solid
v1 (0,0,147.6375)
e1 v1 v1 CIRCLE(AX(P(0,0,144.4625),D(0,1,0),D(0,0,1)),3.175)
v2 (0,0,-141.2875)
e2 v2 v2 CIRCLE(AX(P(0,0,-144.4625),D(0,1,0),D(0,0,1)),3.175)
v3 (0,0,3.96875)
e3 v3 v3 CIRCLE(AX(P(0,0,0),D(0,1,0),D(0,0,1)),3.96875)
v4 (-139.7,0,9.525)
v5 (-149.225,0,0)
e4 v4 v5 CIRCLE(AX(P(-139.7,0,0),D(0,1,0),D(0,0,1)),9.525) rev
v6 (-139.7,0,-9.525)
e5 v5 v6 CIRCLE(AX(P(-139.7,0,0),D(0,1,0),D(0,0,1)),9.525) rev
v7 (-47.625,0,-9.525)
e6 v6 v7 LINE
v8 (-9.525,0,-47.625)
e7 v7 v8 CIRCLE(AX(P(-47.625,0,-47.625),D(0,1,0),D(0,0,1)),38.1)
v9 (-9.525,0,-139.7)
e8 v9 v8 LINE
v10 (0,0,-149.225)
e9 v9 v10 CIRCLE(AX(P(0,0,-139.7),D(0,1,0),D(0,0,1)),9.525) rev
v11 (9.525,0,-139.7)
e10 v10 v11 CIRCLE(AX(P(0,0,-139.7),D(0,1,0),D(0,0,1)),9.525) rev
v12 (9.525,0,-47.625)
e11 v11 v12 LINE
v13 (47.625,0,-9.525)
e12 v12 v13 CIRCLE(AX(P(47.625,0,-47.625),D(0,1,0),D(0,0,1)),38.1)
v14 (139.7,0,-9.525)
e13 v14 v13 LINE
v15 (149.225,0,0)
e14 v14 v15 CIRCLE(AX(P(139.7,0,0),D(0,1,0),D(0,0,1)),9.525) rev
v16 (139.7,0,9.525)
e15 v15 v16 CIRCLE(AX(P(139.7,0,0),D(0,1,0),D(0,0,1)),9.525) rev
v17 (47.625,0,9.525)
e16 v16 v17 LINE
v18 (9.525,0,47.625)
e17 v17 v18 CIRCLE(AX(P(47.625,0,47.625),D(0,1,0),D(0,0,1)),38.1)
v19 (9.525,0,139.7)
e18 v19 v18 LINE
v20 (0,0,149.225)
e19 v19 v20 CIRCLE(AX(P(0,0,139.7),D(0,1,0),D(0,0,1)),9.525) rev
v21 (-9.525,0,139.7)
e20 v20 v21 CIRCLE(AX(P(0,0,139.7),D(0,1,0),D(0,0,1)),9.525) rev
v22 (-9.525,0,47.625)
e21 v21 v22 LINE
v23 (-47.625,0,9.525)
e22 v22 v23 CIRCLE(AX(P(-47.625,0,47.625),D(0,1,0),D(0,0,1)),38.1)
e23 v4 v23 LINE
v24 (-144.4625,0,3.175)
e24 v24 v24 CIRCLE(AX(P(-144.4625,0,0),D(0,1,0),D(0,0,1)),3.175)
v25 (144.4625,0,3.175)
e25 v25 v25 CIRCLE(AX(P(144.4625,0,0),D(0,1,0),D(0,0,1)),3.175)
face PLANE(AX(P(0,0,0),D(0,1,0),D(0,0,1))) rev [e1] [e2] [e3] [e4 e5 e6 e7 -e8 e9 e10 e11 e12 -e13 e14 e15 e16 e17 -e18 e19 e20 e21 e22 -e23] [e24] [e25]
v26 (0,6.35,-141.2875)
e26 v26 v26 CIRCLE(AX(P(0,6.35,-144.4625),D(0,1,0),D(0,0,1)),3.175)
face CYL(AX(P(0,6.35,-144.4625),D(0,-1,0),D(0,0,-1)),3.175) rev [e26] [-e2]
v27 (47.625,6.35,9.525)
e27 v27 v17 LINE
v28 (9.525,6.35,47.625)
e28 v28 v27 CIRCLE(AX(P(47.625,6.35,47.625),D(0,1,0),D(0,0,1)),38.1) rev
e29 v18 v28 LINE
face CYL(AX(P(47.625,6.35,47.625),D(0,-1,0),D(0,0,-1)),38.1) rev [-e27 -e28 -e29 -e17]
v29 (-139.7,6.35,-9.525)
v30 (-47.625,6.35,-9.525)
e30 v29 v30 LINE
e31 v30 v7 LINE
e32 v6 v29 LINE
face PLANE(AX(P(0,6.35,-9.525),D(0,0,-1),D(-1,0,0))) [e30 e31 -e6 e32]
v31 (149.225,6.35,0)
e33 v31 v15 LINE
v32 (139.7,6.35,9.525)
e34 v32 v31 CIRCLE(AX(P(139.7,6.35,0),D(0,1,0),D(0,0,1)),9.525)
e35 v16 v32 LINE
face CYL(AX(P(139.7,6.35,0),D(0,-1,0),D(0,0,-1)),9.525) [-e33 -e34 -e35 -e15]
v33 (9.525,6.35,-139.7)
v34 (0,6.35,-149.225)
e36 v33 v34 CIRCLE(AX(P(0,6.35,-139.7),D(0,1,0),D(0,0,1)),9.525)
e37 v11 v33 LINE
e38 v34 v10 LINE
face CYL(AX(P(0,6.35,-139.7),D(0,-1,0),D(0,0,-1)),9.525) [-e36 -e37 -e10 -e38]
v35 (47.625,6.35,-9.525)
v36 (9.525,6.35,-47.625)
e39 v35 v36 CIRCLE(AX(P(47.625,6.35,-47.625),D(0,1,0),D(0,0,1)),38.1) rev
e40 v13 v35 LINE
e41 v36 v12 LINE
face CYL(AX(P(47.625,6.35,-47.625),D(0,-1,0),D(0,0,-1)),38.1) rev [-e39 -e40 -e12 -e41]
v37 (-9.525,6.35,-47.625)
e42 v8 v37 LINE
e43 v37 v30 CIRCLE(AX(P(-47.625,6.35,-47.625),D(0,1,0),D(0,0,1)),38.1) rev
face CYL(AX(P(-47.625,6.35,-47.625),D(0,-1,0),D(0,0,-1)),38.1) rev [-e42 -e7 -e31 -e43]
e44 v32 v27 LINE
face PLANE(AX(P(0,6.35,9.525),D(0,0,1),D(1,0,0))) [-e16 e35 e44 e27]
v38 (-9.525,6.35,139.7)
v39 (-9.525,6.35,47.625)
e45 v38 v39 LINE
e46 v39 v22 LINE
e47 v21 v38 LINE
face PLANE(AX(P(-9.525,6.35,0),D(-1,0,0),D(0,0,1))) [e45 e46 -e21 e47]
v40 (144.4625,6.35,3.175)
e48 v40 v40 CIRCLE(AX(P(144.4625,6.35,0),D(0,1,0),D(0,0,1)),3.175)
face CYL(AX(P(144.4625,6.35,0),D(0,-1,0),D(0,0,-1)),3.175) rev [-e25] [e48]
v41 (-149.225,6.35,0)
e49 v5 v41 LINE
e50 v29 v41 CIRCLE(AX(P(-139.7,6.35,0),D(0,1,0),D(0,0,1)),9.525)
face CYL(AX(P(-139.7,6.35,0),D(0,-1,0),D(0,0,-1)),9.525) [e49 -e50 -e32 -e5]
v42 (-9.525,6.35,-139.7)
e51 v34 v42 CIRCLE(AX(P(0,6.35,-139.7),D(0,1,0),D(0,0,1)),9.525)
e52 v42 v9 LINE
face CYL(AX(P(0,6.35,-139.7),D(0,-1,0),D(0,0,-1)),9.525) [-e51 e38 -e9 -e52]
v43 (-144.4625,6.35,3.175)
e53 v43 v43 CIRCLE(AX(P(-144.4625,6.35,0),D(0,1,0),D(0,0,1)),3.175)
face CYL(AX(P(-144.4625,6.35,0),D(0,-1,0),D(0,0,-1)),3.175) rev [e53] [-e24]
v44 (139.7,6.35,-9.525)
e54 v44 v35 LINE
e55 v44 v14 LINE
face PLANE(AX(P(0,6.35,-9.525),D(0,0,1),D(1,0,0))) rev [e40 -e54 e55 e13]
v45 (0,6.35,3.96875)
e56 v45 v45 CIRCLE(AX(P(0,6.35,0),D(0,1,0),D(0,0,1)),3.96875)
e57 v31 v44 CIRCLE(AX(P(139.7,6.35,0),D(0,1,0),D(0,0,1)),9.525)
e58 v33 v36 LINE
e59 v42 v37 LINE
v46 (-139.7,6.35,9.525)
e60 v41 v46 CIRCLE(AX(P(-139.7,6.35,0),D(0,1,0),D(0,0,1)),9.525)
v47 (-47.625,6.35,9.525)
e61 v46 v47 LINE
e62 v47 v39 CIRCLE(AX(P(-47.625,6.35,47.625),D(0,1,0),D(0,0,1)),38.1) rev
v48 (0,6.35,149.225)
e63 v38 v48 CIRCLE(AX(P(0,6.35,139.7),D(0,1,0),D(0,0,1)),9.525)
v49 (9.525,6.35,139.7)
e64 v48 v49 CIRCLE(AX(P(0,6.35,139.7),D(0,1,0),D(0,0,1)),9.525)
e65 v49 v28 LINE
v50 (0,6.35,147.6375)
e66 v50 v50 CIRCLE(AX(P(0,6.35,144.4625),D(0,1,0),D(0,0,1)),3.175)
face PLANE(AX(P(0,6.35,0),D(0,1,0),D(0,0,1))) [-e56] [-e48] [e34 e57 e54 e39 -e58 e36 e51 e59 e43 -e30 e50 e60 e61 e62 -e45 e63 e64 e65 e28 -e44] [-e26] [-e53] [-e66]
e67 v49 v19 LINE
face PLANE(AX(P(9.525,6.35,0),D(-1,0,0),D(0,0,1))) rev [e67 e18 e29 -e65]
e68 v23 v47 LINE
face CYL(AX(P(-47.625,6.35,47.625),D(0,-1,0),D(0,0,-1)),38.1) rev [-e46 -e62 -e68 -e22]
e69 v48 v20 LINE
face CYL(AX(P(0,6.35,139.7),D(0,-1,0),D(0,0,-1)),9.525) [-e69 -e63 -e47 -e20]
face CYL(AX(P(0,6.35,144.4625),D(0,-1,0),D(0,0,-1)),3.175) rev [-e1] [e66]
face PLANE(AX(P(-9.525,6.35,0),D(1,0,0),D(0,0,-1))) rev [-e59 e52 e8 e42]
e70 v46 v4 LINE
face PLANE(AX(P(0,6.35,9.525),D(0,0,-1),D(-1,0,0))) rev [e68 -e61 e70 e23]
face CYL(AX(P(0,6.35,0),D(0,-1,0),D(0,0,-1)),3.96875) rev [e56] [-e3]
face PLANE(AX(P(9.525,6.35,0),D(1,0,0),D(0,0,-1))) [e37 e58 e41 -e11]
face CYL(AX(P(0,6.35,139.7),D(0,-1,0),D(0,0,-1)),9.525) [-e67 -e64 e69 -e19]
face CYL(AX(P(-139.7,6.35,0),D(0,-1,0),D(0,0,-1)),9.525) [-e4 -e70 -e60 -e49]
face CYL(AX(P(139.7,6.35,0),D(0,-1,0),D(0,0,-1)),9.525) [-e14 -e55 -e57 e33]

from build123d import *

# Parameters (mm, degrees)
SKETCH2_R           = 3.175
SKETCH2_R_2         = 3.96875
BOSS_EXTRUDE1_DEPTH = 6.35
FILLET1_R           = 9.525
FILLET3_R           = 38.1


with BuildPart() as part:
    # Sketch2 → Boss-Extrude1 (new body)
    with BuildSketch(Plane(origin=(0, 0, 0), x_dir=(1, 0, 0), z_dir=(0, 1, 0))):
        with BuildLine():
            ThreePointArc((-148.920700374, 9.525), (-149.225, 0), (-148.920700374, -9.525))
            Line((-148.920700374, -9.525), (-9.525, -9.525))
            Line((-9.525, -9.525), (-9.525, -148.920700374))
            ThreePointArc((-9.525, -148.920700374), (0, -149.225), (9.525, -148.920700374))
            Line((9.525, -148.920700374), (9.525, -9.525))
            Line((9.525, -9.525), (148.920700374, -9.525))
            ThreePointArc((148.920700374, -9.525), (149.148905692, -4.764929781), (149.225, 0))
            ThreePointArc((149.225, 0), (149.148905692, 4.764929781), (148.920700374, 9.525))
            Line((148.920700374, 9.525), (9.525, 9.525))
            Line((9.525, 9.525), (9.525, 148.920700374))
            ThreePointArc((9.525, 148.920700374), (0, 149.225), (-9.525, 148.920700374))
            Line((-9.525, 148.920700374), (-9.525, 9.525))
            Line((-9.525, 9.525), (-148.920700374, 9.525))
        make_face()
        with Locations(Location((-144.4625, 0, 0), (0, 0, 270))):
            Circle(SKETCH2_R, mode=Mode.SUBTRACT)
        with Locations(Location((0, -144.4625, 0), (0, 0, 270))):
            Circle(SKETCH2_R, mode=Mode.SUBTRACT)
        with Locations(Location((144.4625, 0, 0), (0, 0, 270))):
            Circle(SKETCH2_R, mode=Mode.SUBTRACT)
        with Locations(Location((0, 144.4625, 0), (0, 0, 270))):
            Circle(SKETCH2_R, mode=Mode.SUBTRACT)
        with Locations(Location((0, 0, 0), (0, 0, 270))):
            Circle(SKETCH2_R_2, mode=Mode.SUBTRACT)
    extrude(amount=BOSS_EXTRUDE1_DEPTH)

    # Fillet1
    fillet1_edges = [part.edges().sort_by_distance(p)[0] for p in [
        (-9.525, 3.175, -148.920700374),
        (9.525, 3.175, -148.920700374),
        (148.920700374, 3.175, -9.525),
        (148.920700374, 3.175, 9.525),
        (9.525, 3.175, 148.920700374),
        (-9.525, 3.175, 148.920700374),
        (-148.920700374, 3.175, -9.525),
        (-148.920700374, 3.175, 9.525),
    ]]
    fillet(fillet1_edges, radius=FILLET1_R - 0.0001)  # a hair under: the kernel refuses the full size

    # Fillet3
    fillet3_edges = [part.edges().sort_by_distance(p)[0] for p in [
        (9.525, 3.175, 9.525),
        (-9.525, 3.175, 9.525),
        (-9.525, 3.175, -9.525),
        (9.525, 3.175, -9.525),
    ]]
    fillet(fillet3_edges, radius=FILLET3_R)


solid = part.part
